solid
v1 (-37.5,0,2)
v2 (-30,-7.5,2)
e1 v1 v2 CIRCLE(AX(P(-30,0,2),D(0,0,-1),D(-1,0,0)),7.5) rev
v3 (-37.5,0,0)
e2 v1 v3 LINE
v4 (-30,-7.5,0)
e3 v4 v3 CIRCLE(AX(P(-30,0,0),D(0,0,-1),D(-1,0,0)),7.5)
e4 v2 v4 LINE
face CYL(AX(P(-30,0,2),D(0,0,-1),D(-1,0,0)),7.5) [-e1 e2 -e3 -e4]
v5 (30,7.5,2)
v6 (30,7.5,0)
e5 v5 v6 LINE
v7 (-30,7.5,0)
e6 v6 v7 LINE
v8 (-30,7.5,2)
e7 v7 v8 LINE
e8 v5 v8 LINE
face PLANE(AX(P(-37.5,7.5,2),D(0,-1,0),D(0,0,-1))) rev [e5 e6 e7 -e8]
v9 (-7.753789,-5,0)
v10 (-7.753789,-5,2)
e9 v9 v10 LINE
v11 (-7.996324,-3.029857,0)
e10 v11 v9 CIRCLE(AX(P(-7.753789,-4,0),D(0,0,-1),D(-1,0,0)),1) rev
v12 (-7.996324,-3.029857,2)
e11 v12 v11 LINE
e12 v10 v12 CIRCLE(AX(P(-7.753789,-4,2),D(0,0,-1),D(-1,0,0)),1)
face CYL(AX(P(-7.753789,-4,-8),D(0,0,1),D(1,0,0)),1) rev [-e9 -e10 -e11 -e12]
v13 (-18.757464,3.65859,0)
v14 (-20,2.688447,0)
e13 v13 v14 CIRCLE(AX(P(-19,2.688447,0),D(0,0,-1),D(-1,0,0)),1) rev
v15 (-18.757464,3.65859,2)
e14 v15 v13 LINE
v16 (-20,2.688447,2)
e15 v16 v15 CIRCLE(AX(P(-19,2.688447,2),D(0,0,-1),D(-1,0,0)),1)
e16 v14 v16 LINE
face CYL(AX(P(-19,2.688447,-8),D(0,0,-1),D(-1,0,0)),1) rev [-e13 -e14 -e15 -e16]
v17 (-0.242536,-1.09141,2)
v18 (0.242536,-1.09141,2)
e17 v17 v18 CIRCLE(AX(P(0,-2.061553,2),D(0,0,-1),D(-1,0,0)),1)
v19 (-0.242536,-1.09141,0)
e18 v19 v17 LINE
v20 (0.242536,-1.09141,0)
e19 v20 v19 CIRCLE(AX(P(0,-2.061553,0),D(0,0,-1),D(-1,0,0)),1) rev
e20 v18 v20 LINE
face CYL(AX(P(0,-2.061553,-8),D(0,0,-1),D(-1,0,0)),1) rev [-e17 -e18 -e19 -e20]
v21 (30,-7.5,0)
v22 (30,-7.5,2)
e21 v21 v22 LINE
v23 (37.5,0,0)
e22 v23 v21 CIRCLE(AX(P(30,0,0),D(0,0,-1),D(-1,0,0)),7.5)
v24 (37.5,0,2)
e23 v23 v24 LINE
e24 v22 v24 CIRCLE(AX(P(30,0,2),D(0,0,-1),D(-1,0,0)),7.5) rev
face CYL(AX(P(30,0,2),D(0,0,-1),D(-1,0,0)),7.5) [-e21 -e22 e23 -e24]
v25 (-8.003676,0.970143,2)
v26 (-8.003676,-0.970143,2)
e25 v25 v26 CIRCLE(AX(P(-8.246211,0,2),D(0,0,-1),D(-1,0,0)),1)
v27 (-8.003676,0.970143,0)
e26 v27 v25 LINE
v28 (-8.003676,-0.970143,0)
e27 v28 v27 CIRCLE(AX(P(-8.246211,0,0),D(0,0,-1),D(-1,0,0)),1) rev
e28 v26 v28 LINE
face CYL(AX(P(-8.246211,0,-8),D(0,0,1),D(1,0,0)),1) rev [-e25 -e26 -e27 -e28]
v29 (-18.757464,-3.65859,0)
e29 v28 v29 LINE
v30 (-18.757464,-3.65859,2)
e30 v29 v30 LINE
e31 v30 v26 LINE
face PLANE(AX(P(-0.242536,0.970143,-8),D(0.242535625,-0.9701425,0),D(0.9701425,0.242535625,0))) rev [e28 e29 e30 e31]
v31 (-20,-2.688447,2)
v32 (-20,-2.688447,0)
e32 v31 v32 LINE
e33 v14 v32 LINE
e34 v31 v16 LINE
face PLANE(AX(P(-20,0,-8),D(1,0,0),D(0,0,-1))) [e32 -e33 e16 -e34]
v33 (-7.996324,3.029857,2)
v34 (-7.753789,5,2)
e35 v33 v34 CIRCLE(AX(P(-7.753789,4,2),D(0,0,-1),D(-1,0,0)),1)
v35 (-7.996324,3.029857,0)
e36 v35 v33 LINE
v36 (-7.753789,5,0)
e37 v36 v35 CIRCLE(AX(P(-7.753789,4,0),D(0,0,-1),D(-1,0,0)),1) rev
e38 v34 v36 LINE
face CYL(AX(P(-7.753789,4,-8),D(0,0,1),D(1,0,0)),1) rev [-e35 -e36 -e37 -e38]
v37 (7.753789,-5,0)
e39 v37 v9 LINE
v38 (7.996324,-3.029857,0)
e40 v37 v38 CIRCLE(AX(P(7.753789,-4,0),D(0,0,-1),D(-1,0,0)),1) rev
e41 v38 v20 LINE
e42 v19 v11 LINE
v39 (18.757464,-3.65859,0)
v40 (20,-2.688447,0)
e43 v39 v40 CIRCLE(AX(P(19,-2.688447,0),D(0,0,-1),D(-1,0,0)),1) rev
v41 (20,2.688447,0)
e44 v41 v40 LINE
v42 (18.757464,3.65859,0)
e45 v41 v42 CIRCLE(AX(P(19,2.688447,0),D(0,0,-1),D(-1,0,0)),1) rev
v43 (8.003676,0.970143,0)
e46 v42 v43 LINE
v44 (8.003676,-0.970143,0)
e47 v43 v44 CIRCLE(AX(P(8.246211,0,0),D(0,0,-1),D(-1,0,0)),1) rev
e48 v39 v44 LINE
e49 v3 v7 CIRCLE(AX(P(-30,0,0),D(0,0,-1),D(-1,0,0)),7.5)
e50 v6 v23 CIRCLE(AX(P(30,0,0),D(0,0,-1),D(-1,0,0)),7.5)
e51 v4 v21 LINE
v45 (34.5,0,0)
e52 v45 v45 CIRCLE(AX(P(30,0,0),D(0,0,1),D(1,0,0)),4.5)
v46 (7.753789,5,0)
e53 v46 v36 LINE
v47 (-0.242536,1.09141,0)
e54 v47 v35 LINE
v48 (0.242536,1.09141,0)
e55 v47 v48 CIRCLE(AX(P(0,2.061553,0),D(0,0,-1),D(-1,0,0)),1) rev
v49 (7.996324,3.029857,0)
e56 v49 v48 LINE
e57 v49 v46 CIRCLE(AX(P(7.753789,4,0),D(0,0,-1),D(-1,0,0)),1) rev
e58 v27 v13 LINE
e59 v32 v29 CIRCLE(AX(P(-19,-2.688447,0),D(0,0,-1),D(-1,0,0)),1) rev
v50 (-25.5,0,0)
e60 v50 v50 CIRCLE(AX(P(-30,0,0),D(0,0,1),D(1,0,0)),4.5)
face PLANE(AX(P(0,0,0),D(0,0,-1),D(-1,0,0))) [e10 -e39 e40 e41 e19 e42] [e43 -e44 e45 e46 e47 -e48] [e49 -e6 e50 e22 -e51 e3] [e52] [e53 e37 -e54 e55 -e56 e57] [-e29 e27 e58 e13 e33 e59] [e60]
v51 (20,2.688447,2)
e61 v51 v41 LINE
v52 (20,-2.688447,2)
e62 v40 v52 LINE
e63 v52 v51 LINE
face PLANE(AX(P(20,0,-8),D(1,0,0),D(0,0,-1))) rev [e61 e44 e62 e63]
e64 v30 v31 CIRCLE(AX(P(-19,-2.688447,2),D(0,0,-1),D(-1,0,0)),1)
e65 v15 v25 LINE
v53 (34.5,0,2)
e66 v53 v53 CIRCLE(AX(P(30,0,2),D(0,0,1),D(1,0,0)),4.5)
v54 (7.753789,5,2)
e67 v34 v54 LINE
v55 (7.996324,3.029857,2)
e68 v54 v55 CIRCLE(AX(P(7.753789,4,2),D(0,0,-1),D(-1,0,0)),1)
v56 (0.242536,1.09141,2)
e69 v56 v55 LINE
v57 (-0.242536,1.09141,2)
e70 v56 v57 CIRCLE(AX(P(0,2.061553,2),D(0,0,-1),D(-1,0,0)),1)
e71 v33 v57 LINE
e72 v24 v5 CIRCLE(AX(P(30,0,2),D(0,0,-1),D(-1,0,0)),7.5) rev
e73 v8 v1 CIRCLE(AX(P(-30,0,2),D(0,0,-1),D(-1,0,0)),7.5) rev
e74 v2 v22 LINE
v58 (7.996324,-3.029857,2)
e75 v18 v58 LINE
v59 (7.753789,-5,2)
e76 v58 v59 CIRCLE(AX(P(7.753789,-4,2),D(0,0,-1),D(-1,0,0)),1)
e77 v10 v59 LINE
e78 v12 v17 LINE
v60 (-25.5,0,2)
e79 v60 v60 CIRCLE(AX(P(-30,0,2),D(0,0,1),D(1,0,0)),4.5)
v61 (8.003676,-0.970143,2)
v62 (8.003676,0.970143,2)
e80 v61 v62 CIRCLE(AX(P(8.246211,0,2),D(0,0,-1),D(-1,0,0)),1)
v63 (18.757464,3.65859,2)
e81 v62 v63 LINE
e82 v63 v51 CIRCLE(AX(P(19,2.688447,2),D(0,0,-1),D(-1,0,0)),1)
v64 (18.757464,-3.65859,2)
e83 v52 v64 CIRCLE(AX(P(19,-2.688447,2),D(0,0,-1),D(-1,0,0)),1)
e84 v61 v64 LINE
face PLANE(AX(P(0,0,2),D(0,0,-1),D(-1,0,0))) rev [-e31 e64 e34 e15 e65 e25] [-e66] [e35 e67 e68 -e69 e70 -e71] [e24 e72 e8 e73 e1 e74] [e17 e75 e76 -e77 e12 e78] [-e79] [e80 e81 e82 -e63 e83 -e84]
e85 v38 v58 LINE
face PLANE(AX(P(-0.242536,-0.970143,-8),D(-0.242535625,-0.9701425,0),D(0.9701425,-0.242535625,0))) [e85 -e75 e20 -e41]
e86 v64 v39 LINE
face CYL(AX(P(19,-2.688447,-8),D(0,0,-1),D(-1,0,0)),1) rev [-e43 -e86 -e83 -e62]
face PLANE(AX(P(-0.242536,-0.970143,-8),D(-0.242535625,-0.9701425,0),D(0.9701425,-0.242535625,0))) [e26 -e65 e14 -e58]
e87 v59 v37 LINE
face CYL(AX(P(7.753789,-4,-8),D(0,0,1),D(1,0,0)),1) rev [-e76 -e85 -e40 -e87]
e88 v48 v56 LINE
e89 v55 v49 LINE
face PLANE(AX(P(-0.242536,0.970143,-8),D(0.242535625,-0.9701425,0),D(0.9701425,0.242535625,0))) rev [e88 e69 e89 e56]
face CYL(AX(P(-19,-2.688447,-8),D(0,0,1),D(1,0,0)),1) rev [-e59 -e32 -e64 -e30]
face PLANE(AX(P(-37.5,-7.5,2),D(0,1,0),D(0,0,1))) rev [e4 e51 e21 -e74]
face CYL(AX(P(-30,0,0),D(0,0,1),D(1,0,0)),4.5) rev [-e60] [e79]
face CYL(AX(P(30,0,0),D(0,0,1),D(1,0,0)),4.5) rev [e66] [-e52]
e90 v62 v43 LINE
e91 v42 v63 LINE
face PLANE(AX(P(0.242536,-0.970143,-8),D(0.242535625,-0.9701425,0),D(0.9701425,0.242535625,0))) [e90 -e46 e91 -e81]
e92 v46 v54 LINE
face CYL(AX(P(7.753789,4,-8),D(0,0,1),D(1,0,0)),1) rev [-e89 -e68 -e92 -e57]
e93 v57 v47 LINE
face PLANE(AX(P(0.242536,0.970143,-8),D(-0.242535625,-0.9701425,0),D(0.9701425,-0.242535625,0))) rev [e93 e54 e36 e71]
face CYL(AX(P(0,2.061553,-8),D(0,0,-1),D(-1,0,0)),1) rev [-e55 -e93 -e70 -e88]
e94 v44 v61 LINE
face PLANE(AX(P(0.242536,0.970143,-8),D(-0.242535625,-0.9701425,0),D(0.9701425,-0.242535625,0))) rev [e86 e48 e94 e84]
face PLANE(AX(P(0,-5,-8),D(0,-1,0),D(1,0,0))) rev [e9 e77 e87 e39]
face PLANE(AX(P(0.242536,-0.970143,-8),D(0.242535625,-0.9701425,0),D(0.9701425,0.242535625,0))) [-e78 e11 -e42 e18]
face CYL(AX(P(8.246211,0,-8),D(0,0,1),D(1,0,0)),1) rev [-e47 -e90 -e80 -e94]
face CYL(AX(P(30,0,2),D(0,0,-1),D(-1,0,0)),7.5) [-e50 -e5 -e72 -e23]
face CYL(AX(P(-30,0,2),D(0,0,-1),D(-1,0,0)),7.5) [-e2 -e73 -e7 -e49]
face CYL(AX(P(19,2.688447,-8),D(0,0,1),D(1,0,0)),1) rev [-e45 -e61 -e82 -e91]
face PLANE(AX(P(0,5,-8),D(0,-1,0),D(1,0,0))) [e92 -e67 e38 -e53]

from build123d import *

# Parameters (mm, degrees)
SKETCH_1_W          = 75
SKETCH_1_H          = 15
EXTRUDE_1_DEPTH     = 2
FILLET_1_R          = 7.5
SKETCH_2_R          = 4.5
CUT_EXTRUDE_1_DEPTH = 2
CUT_EXTRUDE_2_DEPTH = 10
FILLET_2_R          = 1


with BuildPart() as part:
    # 草图1 → 凸台-拉伸1 (new body)
    with BuildSketch(Plane.XY):
        Rectangle(SKETCH_1_W, SKETCH_1_H)
    extrude(amount=EXTRUDE_1_DEPTH)

    # 圆角1
    fillet_1_edges = [part.edges().sort_by_distance(p)[0] for p in [
        (37.5, -7.5, 1),
        (-37.5, -7.5, 1),
        (-37.5, 7.5, 1),
        (37.5, 7.5, 1),
    ]]
    fillet(fillet_1_edges, radius=FILLET_1_R - 0.0001)  # a hair under: the kernel refuses the full size

    # 草图2 → 切除-拉伸1 (cut)
    with BuildSketch(Plane.XY.offset(2)):
        with Locations((30, 0)):
            Circle(SKETCH_2_R)
        with Locations((-30, 0)):
            Circle(SKETCH_2_R)
    extrude(amount=-CUT_EXTRUDE_1_DEPTH, mode=Mode.SUBTRACT)

    # 草图3 → 切除-拉伸2 (cut)
    with BuildSketch(Plane.XY.offset(2)):
        Polygon((4.123105626, 0), (20, 3.969223594), (20, -3.969223594), align=None)
        Polygon((-15.876894374, 5), (0, 1.030776406), (15.876894374, 5), align=None)
        Polygon((0, -1.030776406), (15.876894374, -5), (-15.876894374, -5), align=None)
        Polygon((-20, 3.969223594), (-20, -3.969223594), (-4.123105626, 0), align=None)
    extrude(amount=-CUT_EXTRUDE_2_DEPTH, mode=Mode.SUBTRACT)

    # 圆角2
    fillet_2_edges = [part.edges().sort_by_distance(p)[0] for p in [
        (4.123105626, 0, 1),
        (20, 3.969223594, 1),
        (20, -3.969223594, 1),
        (0, -1.030776406, 1),
        (15.876894374, -5, 1),
        (-15.876894374, -5, 1),
        (-20, -3.969223594, 1),
        (-20, 3.969223594, 1),
        (-4.123105626, 0, 1),
        (0, 1.030776406, 1),
        (-15.876894374, 5, 1),
        (15.876894374, 5, 1),
    ]]
    fillet(fillet_2_edges, radius=FILLET_2_R)


solid = part.part
